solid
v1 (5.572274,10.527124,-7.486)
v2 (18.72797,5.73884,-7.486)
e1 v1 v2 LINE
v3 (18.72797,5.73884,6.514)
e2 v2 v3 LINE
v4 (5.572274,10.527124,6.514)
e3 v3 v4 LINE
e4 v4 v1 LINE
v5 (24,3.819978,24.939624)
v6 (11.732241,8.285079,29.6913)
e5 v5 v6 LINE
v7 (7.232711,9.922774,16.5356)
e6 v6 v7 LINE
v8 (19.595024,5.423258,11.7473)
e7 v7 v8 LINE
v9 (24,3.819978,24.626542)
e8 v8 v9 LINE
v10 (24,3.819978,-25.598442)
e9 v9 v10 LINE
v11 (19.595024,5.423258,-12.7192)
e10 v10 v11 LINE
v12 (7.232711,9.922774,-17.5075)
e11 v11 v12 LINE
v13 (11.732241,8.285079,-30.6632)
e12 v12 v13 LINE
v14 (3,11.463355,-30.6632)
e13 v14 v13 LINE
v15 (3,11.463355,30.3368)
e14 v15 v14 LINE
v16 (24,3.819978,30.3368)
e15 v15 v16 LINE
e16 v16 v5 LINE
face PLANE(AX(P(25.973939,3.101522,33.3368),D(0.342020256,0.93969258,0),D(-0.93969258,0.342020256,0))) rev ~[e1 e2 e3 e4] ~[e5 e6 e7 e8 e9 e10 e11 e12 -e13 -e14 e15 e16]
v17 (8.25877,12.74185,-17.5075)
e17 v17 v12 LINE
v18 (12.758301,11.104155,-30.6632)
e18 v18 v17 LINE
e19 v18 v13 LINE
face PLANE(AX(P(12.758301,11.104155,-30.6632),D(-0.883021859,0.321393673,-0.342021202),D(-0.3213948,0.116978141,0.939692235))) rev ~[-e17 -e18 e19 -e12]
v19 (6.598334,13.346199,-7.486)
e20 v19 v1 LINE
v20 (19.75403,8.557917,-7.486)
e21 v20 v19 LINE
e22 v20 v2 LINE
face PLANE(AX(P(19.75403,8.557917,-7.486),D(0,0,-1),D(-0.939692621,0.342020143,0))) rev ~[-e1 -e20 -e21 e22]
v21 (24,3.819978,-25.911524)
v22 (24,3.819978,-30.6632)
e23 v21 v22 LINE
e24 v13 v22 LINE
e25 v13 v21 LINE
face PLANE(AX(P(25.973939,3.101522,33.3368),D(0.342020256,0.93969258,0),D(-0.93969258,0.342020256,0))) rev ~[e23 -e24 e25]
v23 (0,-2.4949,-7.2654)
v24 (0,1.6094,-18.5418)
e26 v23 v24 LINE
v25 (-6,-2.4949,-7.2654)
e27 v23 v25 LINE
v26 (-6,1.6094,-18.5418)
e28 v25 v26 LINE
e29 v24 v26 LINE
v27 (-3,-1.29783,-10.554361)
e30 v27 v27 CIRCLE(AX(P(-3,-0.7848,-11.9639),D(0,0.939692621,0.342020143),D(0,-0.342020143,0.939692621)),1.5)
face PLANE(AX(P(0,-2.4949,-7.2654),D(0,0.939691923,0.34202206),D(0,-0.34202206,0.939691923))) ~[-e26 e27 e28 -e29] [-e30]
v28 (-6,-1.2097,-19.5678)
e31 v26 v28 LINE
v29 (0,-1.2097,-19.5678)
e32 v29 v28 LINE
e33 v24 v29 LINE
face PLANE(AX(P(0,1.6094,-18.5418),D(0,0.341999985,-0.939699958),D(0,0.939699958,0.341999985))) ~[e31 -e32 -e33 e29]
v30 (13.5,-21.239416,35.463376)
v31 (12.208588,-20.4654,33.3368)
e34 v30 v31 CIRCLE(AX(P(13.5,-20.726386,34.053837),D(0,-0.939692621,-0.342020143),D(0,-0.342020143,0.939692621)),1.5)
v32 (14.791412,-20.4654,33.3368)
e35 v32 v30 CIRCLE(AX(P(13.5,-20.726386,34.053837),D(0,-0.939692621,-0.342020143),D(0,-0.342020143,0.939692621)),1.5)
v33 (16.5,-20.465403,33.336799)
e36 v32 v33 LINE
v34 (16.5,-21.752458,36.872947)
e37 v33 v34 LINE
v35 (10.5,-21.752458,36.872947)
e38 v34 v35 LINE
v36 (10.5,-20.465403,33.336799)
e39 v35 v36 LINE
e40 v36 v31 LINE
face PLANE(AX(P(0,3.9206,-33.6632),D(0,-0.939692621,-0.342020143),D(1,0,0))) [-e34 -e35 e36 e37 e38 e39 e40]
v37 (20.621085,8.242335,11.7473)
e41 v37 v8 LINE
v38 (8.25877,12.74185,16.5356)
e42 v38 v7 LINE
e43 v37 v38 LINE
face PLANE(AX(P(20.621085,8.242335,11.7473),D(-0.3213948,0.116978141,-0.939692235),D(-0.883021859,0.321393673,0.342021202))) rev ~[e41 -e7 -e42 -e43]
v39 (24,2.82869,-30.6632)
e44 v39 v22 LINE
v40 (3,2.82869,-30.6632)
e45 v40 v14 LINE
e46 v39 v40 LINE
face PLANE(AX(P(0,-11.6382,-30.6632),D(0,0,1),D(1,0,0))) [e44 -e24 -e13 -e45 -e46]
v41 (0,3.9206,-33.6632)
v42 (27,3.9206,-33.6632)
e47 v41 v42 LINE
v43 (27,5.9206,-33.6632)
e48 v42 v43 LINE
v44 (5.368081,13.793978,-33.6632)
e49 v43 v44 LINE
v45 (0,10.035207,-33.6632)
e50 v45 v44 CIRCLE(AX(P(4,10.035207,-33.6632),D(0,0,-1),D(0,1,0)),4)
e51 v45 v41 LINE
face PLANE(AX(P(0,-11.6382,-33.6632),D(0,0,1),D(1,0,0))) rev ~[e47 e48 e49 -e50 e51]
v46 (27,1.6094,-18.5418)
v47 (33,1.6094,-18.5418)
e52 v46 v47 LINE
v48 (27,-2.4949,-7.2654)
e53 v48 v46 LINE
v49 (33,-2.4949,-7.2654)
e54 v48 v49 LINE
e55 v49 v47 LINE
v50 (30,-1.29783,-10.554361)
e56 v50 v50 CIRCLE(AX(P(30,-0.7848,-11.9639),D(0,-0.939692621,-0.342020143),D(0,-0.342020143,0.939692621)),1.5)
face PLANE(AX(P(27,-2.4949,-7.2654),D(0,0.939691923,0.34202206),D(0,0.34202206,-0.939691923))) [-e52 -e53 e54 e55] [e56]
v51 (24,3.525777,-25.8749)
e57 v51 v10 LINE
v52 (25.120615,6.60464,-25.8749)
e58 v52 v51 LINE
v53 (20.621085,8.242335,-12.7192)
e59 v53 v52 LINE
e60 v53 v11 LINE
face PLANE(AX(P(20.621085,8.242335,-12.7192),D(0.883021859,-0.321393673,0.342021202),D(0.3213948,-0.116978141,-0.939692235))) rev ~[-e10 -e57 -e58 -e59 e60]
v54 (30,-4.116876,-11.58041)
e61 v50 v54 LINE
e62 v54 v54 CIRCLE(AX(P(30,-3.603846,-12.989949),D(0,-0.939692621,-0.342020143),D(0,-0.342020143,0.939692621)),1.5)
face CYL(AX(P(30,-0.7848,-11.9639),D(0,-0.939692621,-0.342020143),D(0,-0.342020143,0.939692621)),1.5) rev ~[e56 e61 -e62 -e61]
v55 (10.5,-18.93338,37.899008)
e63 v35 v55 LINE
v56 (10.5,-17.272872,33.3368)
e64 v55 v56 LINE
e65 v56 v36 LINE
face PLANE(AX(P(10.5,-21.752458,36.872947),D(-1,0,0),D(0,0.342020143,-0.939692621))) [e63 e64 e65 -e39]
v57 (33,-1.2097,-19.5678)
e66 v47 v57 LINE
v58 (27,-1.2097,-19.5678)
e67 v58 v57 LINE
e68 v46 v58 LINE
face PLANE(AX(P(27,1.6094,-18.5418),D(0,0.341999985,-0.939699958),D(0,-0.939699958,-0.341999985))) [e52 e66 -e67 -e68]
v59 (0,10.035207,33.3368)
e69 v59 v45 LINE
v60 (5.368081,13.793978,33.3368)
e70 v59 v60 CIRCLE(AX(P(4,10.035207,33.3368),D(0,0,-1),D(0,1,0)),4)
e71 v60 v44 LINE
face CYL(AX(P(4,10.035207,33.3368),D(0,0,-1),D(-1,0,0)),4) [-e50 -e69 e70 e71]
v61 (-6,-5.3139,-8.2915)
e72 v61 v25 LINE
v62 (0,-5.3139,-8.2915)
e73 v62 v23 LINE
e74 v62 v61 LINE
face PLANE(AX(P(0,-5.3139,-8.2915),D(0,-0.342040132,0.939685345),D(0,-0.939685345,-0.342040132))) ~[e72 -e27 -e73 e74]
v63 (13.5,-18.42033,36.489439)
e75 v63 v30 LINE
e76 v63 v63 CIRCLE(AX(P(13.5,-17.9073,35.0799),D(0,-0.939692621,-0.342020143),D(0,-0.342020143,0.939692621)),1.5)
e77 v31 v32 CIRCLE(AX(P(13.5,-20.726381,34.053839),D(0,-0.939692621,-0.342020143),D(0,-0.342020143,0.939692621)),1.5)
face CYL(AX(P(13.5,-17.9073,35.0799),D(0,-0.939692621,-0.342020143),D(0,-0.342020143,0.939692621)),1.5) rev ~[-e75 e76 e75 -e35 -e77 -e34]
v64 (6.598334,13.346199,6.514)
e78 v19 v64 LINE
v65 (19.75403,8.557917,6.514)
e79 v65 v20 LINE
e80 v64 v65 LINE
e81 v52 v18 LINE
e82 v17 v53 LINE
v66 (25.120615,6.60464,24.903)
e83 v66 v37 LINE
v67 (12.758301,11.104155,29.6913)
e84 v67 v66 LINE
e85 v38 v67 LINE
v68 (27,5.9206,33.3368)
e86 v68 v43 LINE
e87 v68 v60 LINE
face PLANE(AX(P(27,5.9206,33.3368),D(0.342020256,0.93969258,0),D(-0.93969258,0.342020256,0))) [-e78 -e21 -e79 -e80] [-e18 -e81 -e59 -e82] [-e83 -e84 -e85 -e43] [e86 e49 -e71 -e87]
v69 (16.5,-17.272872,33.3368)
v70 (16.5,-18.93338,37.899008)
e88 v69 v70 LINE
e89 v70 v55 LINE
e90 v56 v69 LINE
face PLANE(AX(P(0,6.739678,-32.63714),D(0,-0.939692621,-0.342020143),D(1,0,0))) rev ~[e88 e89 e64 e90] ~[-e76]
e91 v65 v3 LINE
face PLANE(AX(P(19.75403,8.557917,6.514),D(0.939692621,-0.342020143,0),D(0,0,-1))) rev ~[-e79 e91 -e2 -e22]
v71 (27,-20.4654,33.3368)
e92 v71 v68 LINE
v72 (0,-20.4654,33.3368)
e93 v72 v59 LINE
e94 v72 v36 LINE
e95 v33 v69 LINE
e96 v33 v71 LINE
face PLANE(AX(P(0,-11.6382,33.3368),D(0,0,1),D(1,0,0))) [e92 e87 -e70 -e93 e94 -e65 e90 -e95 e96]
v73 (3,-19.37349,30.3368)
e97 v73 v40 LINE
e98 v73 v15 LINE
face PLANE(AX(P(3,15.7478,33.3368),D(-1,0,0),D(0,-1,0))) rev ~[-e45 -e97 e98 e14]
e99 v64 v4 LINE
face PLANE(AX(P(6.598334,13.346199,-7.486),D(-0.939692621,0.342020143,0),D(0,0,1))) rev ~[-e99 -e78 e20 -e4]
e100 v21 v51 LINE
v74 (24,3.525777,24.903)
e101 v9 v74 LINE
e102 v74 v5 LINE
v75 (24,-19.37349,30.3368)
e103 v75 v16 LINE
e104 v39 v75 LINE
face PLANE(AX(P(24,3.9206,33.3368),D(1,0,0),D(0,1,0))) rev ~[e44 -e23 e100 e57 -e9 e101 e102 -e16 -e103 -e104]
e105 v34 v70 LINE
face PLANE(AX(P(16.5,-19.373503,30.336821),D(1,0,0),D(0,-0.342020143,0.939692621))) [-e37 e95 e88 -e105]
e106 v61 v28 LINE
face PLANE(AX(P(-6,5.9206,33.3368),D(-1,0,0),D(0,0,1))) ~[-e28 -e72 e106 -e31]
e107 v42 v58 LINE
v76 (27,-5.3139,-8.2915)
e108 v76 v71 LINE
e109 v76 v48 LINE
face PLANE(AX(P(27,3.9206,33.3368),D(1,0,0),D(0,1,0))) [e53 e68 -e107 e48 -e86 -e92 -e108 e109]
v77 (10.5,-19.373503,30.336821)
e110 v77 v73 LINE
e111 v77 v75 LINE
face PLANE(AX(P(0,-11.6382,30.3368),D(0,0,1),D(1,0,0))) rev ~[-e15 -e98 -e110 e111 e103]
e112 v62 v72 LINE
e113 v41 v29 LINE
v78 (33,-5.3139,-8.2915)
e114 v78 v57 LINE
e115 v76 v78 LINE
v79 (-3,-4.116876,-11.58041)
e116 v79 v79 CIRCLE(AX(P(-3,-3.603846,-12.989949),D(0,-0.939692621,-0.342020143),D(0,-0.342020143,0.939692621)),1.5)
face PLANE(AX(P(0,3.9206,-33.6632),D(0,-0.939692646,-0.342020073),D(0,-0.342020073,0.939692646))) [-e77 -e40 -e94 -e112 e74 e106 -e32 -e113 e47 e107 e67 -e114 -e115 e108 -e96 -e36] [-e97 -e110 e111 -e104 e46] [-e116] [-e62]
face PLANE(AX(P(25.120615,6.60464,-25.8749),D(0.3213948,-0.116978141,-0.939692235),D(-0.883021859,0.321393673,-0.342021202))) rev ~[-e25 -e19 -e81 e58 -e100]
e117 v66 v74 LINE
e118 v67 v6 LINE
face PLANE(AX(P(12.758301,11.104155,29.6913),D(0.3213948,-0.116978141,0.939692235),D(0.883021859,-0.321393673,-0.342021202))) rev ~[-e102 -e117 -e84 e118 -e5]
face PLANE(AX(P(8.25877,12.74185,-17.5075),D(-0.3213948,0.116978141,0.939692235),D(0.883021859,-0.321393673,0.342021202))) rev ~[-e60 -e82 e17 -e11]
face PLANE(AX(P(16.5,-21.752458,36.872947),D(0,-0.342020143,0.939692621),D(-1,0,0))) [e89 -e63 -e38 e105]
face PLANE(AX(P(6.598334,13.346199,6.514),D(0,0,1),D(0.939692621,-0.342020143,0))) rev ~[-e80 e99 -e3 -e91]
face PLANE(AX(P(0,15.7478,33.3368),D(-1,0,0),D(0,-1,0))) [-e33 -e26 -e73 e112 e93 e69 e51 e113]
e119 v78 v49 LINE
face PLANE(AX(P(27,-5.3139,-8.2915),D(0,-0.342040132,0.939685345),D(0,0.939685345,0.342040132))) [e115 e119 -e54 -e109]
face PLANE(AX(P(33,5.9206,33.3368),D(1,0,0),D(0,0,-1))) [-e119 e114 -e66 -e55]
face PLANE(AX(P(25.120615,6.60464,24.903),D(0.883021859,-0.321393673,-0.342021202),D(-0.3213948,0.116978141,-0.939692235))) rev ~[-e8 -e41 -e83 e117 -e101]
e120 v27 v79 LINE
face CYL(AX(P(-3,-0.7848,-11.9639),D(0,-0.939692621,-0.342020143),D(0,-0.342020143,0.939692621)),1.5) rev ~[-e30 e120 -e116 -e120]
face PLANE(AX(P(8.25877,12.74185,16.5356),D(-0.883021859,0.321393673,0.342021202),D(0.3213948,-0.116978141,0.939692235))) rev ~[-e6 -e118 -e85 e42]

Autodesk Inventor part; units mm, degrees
ref_plane "YZ Plane" through (0, 0, 0) normal (1, 0, 0) x (0, 1, 0)
ref_plane "XZ Plane" through (0, 0, 0) normal (0, 1, 0) x (-1, 0, 0)
ref_plane "XY Plane" through (0, 0, 0) normal (0, 0, 1) x (1, 0, 0)
ref_plane "Work Plane1" through (0, -11.6382, 33.3368) normal (0, 0, 1) x (1, 0, 0)
sketch "Sketch7" plane through (0, -11.6382, 33.3368) normal (0, 0, 1) x (1, 0, 0)
  line L0 (0, 15.5588) -> (27, 15.5588)
  line L1 (27, 15.5588) -> (27, 17.5588)
  line L2 (27, 17.5588) -> (0, 27.386)
  line L3 (0, 27.386) -> (0, 15.5588)
  line L4 (0, 15.5588) -> (27, 15.5588)
  point P0 (0, 11.6382)
  dimension "d20" = 2
  dimension "d21" = 110
  dimension "d76" = 27
extrude "Extrusion5" add sketch "Sketch7" against normal blind 67
sketch "Sketch8" plane through (0, 3.9206, 33.3368) normal (-1, 0, 0) x (0, 0, 1)
  line L0 (0, 0) -> (-67, 0) projected
  line L1 (-67, 0) -> (0, -24.386)
  line L2 (0, -24.386) -> (0, 0)
  point P0 (-33.3368, -3.9206)
  dimension "d27" = 20
extrude "Extrusion6" add sketch "Sketch8" against normal up to surface (27 mm away)
shell "Shell3" thickness 3 removed faces 1 at (9, -4.2081, -11.3299)
sketch "Sketch9" plane through (27, 5.9206, 33.3368) normal (0.3420201, 0.9396926, 0) x (0.9396926, -0.3420201, 0)
  line L0 (-21.711, 26.8228) -> (-7.711, 26.8228)
  line L1 (-7.711, 26.8228) -> (-7.711, 40.8228)
  line L2 (-7.711, 40.8228) -> (-21.711, 40.8228)
  line L3 (-21.711, 40.8228) -> (-21.711, 26.8228)
  line L4 (-7.711, 33.8228) -> (47.289, 33.8228) construction
  line L5 (-15.1557, 3.6455) -> (-2, 8.4338)
  line L6 (-2, 8.4338) -> (-6.7883, 21.5895)
  line L7 (-6.7883, 21.5895) -> (-19.944, 16.8012)
  line L8 (-19.944, 16.8012) -> (-15.1557, 3.6455)
  line L9 (-19.944, 50.8443) -> (-6.7883, 46.056)
  line L10 (-6.7883, 46.056) -> (-2, 59.2117)
  line L11 (-2, 59.2117) -> (-15.1557, 64)
  line L12 (-15.1557, 64) -> (-19.944, 50.8443)
  line L13 (0, 0) -> (0, 67) projected
  line L14 (-28.7328, 67) -> (0, 67) projected
  point P0 (-4.3941, 15.0117)
  point P1 (-4.3941, 52.6339)
  dimension "d31" = 14
  dimension "d32" = 55
  dimension "d35" = 20
  dimension "d39" = 20
  dimension "d41" = 2
  dimension "d42" = 3
extrude "Extrusion7" cut sketch "Sketch9" against normal up to next
fillet "Fillet1" radius 4 1 edges at (0, 15.7478, -0.1632)
sketch "Sketch10" plane through (27, 5.9206, 33.3368) normal (1, 0, 0) x (0, 0, -1)
  line L0 (0, -26.386) -> (67, -2) projected
  line L1 (41.6283, -11.2345) -> (40.6022, -8.4155)
  line L2 (40.6022, -8.4155) -> (51.8786, -4.3112)
  line L3 (51.8786, -4.3112) -> (52.9046, -7.1303)
  point P0 (33.3368, -5.9206)
  dimension "d46" = 3
  dimension "d47" = 12
  dimension "d48" = 15
ref_plane "Work Plane2" through (13.5, 5.9206, 33.3368) normal (1, 0, 0) x (0, 0, -1)
extrude "Extrusion8" add sketch "Sketch10" along normal blind 6
sketch "Sketch11" plane through (27, -2.4949, -7.2655) normal (0, 0.9396926, 0.3420201) x (1, 0, 0)
  line L0 (0, 0) -> (6, 0) projected
  line L1 (6, 12) -> (6, 0) projected
  point P0 (-27, -5.974)
  point P1 (3, 5)
  dimension "d52" = 5
  dimension "d53" = 3
hole "Hole1" at (30, -0.7848, -11.9639) direction (0, -0.9396926, -0.3420201) diameter 3 end through all
mirror "Mirror2" about plane through (13.5, 5.9206, 33.3368) normal (1, 0, 0) of "Extrusion8", "Hole1"
sketch "Sketch12" plane through (0, 3.9206, -33.6632) normal (0, -0.9396926, -0.3420201) x (1, 0, 0)
  line L0 (3, 68.1074) -> (24, 68.1074) projected
  line L1 (10.5, 68.1074) -> (16.5, 68.1074)
  line L2 (16.5, 68.1074) -> (16.5, 75.063)
  line L3 (16.5, 75.063) -> (10.5, 75.063)
  line L4 (10.5, 75.063) -> (10.5, 68.1074)
  line L5 (27, 0) -> (0, 0) projected
  line L6 (27, 71.2999) -> (27, 27) projected
  point P0 (0, 32.974)
  dimension "d61" = 75.063
  dimension "d62" = 6
  dimension "d64" = 10.5
extrude "Extrusion9" add sketch "Sketch12" against normal blind 3
sketch "Sketch13" plane through (0, 6.7397, -32.6372) normal (0, 0.9396926, 0.3420201) x (1, 0, 0)
  line L0 (10.5, -75.063) -> (16.5, -75.063) projected
  line L1 (16.5, -75.063) -> (16.5, -70.208) projected
  point P0 (0, -32.974)
  point P1 (13.5, -72.063)
  dimension "d67" = 3
  dimension "d68" = 3
hole "Hole2" at (13.5, -17.9073, 35.0799) direction (0, -0.9396926, -0.3420201) diameter 3 end through all
properties part number "k2_t_l1a"
